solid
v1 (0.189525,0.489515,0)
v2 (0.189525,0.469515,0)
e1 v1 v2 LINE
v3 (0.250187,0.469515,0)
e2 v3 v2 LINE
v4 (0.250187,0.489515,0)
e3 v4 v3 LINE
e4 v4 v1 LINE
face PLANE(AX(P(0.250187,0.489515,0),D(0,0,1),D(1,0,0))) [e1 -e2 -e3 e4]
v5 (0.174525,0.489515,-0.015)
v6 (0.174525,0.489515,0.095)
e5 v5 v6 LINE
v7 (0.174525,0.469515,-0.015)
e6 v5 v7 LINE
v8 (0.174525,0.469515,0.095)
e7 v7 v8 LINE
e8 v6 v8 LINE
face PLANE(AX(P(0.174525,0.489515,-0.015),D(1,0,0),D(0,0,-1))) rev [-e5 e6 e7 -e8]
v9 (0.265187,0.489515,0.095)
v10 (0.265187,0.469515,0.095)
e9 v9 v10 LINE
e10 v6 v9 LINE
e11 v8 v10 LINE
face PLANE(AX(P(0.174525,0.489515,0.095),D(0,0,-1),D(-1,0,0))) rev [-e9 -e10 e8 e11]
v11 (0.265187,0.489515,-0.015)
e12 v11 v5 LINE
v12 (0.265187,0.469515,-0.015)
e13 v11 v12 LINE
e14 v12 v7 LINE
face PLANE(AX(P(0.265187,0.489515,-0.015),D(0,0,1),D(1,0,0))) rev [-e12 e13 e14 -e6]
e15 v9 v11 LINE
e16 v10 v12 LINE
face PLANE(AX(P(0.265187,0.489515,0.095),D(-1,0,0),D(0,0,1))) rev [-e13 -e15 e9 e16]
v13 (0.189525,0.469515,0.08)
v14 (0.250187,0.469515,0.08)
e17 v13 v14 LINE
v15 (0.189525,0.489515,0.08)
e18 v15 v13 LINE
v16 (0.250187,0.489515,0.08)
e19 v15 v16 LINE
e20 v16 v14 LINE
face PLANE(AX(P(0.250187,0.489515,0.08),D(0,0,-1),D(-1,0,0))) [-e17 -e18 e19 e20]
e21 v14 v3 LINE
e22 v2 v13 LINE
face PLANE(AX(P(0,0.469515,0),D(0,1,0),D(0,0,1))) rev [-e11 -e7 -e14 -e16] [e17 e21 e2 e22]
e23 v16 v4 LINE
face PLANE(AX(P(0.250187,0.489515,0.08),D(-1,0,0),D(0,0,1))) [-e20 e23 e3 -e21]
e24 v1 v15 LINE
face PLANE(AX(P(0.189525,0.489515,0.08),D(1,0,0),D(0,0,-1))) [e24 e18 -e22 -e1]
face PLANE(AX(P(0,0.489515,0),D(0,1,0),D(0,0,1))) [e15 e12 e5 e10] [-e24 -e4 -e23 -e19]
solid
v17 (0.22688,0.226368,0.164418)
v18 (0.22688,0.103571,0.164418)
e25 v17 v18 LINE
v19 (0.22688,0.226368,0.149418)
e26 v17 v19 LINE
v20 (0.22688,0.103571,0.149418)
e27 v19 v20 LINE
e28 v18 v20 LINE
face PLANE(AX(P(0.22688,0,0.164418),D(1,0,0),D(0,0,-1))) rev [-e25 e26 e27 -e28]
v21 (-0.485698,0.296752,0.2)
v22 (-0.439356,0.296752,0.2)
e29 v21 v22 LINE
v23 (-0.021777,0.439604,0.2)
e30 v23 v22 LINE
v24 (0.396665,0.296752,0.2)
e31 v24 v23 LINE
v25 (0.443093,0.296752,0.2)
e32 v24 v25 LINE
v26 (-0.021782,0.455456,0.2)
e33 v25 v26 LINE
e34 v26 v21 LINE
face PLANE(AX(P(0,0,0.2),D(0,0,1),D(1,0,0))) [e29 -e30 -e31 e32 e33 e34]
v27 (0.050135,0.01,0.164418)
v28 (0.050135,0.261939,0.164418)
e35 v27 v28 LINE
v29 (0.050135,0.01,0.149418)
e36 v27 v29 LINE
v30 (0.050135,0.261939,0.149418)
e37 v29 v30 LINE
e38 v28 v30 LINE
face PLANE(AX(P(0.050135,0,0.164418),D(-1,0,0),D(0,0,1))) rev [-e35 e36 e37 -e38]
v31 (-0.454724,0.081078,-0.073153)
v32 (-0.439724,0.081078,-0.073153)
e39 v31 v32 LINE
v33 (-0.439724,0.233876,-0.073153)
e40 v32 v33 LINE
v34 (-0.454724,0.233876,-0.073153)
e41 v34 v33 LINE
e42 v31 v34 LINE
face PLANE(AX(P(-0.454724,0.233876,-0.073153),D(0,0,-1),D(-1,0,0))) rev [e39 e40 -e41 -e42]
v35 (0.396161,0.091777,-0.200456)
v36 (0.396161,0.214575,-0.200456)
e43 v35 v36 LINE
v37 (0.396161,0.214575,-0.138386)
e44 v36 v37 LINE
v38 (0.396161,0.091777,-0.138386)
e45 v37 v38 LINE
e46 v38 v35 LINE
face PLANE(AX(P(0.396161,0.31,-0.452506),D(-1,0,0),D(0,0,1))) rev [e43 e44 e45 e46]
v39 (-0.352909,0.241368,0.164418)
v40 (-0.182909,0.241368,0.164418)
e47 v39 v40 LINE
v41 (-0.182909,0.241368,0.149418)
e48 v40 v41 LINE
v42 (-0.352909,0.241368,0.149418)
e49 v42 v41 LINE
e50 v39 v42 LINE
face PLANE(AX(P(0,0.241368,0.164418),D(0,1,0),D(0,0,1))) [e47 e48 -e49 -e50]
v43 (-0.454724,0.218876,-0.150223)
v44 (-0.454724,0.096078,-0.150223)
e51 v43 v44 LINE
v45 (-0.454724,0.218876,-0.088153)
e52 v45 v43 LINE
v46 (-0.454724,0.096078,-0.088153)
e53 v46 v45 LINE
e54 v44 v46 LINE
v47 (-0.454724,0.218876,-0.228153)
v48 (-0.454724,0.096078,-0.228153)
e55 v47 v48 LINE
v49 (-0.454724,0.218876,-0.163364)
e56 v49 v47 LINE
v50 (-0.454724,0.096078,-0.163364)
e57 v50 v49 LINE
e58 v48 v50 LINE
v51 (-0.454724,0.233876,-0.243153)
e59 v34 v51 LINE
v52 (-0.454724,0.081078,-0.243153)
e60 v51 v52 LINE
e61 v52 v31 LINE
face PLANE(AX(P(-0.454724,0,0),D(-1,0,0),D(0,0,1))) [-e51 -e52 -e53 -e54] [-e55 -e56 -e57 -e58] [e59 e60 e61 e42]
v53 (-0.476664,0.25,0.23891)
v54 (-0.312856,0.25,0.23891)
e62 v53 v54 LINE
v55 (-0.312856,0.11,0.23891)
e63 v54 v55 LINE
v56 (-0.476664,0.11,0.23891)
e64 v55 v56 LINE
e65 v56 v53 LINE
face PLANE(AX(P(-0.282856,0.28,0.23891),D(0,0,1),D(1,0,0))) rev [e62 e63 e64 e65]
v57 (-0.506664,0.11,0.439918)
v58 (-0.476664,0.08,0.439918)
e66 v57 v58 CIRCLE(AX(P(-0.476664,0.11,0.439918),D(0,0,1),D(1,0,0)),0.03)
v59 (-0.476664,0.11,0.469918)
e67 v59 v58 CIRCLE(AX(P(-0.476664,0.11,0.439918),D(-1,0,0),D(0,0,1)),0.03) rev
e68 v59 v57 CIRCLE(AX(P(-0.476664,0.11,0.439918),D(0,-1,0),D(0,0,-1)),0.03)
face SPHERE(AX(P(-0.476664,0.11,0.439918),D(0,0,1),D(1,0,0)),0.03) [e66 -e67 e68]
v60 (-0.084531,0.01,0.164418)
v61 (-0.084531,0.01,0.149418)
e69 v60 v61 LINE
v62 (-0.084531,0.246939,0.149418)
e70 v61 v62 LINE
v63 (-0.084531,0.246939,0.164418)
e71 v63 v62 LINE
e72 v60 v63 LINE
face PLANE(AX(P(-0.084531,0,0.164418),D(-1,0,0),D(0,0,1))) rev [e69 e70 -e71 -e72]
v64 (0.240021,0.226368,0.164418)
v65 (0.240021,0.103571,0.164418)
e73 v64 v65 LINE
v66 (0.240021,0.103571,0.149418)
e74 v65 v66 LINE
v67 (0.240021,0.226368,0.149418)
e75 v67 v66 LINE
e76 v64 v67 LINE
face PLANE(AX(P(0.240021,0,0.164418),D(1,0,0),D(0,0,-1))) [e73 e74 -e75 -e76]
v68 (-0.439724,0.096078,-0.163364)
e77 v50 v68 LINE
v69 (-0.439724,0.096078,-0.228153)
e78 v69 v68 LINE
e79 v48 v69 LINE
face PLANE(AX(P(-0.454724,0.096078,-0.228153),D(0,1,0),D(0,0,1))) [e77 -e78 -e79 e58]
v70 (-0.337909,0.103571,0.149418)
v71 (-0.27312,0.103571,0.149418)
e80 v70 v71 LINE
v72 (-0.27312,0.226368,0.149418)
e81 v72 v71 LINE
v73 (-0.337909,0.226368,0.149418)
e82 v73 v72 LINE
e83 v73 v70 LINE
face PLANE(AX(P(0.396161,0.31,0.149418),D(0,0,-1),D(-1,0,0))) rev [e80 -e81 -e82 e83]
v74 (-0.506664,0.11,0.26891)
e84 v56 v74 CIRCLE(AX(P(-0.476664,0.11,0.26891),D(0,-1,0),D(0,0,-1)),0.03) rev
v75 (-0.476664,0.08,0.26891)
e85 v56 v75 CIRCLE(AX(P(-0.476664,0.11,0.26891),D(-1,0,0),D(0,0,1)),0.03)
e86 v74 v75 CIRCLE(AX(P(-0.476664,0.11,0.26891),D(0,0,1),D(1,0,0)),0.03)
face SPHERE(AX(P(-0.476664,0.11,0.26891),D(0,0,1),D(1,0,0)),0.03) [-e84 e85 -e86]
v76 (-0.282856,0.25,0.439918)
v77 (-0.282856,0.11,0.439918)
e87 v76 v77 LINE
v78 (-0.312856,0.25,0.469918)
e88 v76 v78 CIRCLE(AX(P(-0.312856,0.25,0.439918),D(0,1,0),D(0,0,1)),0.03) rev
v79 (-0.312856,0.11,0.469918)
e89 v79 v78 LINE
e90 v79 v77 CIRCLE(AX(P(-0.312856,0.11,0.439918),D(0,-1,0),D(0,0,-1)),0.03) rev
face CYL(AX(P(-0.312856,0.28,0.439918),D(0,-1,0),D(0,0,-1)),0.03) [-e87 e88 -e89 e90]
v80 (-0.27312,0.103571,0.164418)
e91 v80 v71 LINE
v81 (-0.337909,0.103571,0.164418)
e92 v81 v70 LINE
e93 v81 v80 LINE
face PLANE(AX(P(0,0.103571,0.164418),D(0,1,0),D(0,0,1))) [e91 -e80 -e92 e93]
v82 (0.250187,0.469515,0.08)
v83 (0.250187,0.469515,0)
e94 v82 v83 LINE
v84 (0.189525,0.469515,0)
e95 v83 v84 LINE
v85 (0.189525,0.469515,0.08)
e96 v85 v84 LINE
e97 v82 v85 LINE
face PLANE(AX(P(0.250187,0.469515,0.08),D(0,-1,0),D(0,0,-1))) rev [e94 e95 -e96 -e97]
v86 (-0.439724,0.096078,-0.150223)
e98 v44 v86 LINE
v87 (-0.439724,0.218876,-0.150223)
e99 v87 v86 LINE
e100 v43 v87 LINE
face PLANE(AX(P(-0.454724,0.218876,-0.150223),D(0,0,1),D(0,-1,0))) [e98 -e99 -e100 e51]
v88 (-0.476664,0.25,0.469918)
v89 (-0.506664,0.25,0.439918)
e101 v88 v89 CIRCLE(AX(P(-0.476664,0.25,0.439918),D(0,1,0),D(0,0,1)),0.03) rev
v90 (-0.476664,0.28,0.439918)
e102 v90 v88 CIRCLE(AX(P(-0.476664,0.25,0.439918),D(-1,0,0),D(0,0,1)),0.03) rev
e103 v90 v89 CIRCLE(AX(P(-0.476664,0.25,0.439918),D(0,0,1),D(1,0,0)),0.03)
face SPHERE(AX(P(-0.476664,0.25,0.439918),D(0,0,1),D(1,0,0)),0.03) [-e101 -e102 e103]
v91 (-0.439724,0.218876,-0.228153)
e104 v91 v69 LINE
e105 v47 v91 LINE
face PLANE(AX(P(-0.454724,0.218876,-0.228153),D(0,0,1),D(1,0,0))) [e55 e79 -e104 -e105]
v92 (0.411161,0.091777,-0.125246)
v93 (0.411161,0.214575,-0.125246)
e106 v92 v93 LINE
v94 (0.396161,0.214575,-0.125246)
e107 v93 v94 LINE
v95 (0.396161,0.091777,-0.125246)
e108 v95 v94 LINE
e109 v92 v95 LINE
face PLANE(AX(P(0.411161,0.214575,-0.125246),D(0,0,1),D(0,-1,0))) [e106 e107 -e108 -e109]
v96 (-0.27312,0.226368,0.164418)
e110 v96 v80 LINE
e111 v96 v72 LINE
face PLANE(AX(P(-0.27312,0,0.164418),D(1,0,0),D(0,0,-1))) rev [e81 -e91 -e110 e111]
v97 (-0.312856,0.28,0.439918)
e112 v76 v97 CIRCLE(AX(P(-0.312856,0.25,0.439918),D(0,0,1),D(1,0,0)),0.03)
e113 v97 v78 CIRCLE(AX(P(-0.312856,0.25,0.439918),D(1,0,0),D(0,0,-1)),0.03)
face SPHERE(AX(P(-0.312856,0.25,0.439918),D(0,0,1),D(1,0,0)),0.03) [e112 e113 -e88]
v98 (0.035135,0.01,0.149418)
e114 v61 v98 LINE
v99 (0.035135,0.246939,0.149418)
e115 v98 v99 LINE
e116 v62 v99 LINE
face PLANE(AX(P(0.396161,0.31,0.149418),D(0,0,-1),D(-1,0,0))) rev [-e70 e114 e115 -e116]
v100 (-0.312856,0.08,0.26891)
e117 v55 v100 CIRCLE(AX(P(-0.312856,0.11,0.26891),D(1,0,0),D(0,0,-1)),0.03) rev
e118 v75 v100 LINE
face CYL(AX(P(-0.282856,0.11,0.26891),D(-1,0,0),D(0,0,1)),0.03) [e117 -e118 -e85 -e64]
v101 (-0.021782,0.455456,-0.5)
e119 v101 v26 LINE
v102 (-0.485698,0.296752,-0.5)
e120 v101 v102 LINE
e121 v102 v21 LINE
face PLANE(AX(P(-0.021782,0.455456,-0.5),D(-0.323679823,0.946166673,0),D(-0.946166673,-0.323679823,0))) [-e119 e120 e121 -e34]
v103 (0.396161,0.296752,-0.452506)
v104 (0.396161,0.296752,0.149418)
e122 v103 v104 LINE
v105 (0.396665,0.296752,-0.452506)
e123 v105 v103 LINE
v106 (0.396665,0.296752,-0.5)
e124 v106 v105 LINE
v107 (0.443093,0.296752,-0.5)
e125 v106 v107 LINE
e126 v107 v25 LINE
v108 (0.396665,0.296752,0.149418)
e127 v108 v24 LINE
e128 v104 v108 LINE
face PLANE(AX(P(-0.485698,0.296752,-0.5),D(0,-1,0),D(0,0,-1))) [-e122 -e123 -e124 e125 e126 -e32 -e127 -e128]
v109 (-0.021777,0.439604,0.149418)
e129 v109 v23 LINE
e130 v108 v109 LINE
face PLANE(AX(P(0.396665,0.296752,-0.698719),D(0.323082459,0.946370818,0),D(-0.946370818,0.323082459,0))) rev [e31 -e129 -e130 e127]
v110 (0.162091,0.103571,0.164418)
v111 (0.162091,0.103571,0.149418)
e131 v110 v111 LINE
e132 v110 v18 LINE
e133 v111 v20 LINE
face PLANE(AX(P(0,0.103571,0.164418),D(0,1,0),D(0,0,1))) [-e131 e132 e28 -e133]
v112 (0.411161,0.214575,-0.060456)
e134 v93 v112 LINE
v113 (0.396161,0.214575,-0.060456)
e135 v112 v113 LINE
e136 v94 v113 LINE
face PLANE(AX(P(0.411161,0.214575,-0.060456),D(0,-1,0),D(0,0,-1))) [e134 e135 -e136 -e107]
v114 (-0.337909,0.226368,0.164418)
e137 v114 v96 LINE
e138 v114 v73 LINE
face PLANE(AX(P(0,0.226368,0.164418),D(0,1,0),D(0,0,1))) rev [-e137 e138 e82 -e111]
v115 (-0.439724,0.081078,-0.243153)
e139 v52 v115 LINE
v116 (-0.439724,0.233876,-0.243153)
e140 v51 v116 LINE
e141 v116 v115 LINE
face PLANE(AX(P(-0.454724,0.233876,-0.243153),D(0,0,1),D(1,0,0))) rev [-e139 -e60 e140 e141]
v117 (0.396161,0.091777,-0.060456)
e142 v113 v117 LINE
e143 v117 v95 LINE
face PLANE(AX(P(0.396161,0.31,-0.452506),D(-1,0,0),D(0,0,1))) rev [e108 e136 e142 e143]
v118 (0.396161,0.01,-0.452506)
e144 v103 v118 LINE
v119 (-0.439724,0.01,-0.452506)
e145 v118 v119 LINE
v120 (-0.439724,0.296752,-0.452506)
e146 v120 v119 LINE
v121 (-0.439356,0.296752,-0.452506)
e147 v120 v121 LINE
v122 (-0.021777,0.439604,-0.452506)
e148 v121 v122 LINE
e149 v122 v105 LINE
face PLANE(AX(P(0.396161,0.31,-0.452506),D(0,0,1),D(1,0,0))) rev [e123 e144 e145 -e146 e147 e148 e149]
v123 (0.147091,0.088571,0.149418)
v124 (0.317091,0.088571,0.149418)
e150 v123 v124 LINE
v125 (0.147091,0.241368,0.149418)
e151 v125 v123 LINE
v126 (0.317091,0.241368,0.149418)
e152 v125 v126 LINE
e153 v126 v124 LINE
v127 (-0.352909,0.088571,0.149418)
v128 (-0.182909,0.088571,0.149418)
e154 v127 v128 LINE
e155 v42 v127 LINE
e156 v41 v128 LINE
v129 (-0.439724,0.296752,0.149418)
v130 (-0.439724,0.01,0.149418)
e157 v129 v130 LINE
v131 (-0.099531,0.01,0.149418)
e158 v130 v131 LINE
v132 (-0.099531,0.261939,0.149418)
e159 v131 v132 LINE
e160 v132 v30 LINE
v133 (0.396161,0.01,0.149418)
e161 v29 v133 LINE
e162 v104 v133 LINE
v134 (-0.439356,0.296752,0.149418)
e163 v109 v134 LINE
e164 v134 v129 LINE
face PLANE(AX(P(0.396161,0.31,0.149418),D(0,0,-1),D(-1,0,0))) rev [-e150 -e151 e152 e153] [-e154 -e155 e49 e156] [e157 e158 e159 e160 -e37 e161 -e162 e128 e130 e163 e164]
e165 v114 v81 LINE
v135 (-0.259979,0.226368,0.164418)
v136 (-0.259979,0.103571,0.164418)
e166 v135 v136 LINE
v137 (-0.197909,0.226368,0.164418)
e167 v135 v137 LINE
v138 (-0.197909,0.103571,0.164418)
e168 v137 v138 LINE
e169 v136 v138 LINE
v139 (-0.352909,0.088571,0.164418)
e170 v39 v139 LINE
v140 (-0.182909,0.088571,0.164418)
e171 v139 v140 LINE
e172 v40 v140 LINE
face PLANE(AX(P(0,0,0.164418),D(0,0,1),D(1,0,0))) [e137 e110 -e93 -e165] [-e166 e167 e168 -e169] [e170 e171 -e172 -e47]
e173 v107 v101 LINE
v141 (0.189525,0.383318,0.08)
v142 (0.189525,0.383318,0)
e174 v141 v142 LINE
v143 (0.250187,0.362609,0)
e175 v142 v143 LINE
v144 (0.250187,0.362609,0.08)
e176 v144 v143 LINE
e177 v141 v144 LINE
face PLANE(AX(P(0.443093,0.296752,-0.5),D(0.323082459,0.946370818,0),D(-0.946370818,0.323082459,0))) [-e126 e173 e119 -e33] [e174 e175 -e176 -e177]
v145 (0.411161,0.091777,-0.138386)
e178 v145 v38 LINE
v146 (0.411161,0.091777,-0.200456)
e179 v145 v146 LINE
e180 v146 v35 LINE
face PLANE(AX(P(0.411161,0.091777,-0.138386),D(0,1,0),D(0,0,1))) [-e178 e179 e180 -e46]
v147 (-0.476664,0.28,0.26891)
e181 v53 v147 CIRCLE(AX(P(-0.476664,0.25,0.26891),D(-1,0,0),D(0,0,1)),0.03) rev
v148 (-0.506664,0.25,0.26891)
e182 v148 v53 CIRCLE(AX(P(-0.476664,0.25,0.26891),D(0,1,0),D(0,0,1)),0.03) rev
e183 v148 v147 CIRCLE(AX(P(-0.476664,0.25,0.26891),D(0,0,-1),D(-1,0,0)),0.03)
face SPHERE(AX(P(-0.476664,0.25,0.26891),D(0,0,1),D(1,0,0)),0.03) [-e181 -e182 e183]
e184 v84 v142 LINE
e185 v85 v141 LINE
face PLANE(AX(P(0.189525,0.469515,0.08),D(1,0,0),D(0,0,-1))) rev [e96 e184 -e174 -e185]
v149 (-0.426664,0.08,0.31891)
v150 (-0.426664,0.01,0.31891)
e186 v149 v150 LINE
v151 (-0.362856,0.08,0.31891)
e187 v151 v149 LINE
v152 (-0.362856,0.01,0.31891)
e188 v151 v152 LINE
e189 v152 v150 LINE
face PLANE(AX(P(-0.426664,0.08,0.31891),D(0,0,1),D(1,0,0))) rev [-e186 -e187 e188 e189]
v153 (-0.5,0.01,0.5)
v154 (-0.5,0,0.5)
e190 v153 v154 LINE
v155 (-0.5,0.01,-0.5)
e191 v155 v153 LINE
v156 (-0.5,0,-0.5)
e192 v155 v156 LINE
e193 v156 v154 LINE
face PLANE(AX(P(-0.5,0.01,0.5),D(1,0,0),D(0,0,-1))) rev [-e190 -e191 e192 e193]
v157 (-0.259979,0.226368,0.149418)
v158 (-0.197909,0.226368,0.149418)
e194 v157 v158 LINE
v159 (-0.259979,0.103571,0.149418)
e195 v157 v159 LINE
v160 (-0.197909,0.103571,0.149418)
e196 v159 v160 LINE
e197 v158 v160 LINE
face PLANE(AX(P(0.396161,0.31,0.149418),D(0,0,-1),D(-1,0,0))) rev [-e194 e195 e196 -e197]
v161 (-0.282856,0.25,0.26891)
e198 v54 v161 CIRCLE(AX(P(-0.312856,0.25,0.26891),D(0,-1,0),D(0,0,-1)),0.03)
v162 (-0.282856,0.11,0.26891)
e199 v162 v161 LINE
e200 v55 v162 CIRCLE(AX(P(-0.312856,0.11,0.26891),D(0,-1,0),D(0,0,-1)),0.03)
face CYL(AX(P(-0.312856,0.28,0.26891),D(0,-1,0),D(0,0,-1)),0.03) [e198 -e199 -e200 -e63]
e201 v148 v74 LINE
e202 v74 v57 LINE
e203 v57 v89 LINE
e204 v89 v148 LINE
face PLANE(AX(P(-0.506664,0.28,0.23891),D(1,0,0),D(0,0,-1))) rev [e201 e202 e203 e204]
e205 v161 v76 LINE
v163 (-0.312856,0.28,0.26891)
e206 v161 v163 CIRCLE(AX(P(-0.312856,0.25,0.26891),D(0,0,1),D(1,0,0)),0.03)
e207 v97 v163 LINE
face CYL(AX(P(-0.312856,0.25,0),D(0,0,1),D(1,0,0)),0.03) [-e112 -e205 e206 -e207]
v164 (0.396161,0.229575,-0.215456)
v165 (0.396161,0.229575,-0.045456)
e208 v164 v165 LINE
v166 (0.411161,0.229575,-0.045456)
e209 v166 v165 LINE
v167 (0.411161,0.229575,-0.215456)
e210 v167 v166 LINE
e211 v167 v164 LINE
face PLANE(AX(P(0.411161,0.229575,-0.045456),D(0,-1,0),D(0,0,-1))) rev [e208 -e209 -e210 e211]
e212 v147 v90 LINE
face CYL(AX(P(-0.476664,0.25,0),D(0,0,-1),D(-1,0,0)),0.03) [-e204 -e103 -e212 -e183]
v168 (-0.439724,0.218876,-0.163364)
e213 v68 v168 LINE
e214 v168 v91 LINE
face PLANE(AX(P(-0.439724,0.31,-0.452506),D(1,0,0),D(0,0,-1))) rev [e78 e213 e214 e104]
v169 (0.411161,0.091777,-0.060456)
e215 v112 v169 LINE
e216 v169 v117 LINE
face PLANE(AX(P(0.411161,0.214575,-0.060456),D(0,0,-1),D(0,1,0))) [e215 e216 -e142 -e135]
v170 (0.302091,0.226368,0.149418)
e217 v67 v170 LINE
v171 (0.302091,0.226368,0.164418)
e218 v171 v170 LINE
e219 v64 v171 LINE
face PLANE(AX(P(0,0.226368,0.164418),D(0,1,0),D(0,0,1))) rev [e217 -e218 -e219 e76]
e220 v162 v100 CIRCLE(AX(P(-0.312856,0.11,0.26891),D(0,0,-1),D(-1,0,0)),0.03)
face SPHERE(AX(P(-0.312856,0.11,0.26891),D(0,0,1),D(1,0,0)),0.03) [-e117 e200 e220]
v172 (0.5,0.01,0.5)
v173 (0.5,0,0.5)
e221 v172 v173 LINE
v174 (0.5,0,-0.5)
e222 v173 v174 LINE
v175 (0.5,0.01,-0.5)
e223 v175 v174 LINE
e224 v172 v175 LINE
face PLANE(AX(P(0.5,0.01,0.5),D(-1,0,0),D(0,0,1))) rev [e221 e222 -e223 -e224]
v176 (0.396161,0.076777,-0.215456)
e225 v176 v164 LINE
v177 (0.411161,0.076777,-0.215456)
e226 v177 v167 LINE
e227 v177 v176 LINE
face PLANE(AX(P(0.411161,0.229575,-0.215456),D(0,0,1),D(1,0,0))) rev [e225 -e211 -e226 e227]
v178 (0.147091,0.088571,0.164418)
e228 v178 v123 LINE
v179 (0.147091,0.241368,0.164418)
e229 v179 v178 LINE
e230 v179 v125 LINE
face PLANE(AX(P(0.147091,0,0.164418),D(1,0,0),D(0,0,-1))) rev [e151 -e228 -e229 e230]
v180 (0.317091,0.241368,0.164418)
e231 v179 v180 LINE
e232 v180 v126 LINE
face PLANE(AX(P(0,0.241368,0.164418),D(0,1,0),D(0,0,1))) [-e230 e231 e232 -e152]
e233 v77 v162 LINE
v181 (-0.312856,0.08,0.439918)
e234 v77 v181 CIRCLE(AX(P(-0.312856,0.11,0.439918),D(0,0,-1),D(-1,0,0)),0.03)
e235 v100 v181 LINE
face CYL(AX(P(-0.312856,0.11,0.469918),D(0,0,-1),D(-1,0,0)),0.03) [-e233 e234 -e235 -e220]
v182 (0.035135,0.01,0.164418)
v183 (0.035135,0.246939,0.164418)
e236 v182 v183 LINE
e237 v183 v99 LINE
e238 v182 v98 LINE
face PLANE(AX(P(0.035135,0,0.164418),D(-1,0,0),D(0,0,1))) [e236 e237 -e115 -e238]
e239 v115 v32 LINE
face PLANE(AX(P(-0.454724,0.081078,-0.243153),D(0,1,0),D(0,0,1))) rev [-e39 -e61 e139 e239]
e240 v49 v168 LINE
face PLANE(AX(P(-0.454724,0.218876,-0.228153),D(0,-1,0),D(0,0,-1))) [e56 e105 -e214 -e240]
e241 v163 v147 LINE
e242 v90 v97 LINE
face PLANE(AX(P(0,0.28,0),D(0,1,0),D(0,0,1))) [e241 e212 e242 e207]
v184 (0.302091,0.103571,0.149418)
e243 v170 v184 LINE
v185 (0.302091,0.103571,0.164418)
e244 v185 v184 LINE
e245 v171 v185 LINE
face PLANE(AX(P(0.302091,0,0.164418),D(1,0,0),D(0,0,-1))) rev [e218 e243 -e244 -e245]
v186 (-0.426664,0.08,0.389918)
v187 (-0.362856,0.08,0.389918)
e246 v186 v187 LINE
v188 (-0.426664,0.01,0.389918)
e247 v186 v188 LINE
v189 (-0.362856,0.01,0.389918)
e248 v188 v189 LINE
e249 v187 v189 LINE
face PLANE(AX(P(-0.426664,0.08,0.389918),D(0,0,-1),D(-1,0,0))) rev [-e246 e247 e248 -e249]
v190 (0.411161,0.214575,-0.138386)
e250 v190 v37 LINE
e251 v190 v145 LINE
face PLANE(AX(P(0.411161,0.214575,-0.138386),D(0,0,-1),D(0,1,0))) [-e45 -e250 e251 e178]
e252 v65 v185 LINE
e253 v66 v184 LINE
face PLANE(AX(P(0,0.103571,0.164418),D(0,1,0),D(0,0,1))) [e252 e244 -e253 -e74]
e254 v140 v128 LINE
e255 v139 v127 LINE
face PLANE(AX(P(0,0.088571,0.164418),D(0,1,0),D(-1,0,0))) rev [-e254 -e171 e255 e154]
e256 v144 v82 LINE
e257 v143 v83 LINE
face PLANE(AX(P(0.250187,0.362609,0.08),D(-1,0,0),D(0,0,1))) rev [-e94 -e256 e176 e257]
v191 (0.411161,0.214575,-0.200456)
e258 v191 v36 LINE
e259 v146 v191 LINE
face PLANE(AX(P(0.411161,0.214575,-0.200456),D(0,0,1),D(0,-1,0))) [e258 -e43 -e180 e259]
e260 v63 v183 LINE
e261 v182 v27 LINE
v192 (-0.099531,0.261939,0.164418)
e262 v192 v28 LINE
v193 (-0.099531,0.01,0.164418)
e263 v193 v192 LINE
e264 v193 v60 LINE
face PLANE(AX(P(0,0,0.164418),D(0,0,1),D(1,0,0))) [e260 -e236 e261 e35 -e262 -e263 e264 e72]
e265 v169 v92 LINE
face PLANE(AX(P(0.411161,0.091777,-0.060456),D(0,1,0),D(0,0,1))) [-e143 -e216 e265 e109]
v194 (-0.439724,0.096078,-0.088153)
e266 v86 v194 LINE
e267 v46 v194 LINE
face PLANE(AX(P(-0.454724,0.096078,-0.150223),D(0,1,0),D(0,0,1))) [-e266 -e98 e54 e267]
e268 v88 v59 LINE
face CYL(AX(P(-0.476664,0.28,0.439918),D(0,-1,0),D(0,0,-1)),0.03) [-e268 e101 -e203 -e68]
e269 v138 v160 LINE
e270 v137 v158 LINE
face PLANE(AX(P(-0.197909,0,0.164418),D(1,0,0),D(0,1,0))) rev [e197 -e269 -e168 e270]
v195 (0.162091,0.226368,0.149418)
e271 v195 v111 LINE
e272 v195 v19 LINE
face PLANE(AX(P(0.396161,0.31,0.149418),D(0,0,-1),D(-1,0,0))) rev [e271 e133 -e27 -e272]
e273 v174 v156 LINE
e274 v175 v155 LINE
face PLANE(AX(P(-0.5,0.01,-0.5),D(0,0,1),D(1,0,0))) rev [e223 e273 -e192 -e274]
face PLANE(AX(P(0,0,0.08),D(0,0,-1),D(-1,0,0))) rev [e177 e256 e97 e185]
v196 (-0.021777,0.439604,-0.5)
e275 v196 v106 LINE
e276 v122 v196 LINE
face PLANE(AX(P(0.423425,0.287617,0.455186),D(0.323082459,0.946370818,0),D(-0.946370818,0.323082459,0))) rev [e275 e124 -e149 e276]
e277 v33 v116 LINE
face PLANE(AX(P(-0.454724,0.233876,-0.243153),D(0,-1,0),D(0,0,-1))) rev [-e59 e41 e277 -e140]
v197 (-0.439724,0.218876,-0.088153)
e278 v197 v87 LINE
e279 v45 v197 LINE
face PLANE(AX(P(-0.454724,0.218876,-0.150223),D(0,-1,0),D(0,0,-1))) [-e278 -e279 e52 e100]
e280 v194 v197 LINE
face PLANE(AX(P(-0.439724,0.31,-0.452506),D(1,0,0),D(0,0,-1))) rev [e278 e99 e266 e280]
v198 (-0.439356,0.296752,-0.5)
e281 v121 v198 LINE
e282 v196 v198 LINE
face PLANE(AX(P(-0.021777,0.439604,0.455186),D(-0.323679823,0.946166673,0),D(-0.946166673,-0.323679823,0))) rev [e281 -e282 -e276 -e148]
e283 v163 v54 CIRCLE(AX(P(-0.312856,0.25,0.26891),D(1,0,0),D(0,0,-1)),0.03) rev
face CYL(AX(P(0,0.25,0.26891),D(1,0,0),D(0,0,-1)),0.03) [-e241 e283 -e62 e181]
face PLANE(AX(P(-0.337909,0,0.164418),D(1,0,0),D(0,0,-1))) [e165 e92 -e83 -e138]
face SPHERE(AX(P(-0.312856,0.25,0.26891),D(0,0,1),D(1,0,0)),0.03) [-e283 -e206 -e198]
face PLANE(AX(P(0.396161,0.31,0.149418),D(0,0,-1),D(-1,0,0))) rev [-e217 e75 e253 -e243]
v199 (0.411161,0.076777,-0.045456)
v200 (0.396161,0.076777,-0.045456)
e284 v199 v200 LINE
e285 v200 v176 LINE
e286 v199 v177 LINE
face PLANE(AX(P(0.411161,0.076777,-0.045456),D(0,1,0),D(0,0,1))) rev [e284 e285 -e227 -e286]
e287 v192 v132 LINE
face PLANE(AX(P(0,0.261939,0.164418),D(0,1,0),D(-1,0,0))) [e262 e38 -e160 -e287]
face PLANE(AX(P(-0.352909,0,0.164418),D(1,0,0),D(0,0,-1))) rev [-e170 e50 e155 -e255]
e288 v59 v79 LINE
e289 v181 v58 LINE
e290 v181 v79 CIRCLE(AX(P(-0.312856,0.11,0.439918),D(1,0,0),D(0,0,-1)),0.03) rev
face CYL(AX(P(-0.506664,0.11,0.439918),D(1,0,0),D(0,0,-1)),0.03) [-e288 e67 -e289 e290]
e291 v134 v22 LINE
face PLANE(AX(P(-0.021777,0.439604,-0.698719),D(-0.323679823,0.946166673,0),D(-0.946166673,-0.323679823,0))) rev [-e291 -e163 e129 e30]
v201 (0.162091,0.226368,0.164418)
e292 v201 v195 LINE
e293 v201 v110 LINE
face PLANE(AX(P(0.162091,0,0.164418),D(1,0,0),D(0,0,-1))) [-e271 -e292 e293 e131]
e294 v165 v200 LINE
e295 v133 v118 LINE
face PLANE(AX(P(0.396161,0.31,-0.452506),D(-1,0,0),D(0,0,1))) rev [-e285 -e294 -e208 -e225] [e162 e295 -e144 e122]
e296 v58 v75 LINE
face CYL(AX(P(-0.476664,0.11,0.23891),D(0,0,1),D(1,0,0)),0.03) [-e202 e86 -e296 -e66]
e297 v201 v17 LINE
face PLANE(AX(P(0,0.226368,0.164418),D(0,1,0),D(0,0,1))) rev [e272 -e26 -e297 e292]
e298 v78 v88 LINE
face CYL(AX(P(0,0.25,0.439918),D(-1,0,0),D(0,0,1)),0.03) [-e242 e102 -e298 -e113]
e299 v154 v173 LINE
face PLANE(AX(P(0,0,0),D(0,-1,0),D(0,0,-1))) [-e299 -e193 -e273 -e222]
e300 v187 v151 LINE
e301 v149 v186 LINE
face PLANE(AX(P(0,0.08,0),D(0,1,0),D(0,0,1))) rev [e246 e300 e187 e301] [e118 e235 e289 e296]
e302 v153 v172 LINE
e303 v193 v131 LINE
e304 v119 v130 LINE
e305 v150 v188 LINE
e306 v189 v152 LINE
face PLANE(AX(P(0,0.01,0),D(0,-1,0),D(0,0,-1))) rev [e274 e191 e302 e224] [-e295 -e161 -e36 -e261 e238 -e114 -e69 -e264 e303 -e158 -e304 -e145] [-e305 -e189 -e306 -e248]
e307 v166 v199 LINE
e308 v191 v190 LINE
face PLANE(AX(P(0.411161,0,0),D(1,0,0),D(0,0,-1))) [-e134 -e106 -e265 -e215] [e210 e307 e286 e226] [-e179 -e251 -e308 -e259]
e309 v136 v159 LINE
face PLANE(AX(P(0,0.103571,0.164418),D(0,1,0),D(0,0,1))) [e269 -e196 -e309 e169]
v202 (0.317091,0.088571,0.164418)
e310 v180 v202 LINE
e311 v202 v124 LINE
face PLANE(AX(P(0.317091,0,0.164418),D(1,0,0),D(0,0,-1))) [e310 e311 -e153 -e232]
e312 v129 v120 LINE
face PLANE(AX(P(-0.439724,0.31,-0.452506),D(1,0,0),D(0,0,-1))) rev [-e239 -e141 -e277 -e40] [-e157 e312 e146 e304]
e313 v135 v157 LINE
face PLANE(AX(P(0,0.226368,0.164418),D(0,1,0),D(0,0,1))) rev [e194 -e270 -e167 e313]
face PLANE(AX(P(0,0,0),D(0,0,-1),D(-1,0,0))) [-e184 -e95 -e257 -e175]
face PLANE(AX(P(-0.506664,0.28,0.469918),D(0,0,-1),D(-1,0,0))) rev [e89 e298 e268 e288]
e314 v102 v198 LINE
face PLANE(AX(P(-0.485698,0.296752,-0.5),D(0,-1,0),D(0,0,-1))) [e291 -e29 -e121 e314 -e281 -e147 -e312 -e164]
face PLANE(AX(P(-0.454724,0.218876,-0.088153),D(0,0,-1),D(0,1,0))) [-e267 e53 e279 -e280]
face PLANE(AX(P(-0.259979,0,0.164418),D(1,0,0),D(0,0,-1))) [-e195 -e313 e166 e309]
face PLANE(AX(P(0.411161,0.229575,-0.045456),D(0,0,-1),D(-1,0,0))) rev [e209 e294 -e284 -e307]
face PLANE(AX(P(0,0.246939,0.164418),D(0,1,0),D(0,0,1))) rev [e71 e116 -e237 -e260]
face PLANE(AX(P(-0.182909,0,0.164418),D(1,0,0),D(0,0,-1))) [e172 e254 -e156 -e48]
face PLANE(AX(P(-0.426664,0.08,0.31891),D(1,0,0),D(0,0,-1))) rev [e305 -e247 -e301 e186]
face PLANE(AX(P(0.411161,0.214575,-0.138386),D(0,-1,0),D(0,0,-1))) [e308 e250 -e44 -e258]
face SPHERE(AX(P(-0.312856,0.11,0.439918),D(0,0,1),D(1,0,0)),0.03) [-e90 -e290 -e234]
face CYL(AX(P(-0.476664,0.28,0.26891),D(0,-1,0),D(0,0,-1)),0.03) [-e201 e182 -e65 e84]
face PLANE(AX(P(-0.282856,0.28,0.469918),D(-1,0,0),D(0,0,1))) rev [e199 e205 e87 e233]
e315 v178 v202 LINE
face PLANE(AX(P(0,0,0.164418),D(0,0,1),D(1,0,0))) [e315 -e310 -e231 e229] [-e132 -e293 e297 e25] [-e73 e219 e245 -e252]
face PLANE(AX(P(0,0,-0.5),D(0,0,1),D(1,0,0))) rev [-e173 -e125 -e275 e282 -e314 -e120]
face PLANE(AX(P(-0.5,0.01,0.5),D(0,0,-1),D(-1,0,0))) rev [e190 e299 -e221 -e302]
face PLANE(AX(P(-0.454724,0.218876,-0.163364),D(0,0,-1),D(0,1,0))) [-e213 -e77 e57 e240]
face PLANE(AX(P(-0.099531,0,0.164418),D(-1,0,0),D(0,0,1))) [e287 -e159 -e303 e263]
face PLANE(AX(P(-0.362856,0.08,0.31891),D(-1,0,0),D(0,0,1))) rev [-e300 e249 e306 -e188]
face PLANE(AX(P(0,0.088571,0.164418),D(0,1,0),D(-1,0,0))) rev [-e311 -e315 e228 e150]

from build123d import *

# Parameters (mm, degrees)
ESBO_O1_W                     = 1
ESBO_O1_H                     = 1
RESSALTO_EXTRUS_O1_DEPTH      = 0.01
ESBO_O2_W                     = 0.835884883
ESBO_O2_H                     = 0.601923969
RESSALTO_EXTRUS_O3_DEPTH      = 0.3
RESSALTO_EXTRUS_O5_DEPTH      = 0.2
RESSALTO_EXTRUS_O5_DEPTH_BACK = 0.5
CORTE_EXTRUS_O2_DEPTH         = 0.050581546
CORTE_EXTRUS_O5_DEPTH         = 0.047494485
ESBO_O8_W                     = 0.17
ESBO_O8_H                     = 0.1527975
ESBO_O8_W_2                   = 0.064789378
ESBO_O8_H_2                   = 0.1227975
ESBO_O8_W_3                   = 0.0620701
RESSALTO_EXTRUS_O7_DEPTH      = 0.015
ESBO_O7_W                     = 0.17
ESBO_O7_H                     = 0.1527975
ESBO_O7_W_2                   = 0.064789378
ESBO_O7_H_2                   = 0.1227975
ESBO_O7_W_3                   = 0.0620701
RESSALTO_EXTRUS_O8_DEPTH      = 0.015
ESBO_O6_W                     = 0.17
ESBO_O6_H                     = 0.152797499
ESBO_O6_W_2                   = 0.0620701
ESBO_O6_H_2                   = 0.122797499
ESBO_O6_W_3                   = 0.064789378
RESSALTO_EXTRUS_O9_DEPTH      = 0.015
ESBO_O9_W                     = 0.063807516
ESBO_O9_H                     = 0.071007721
RESSALTO_EXTRUS_O10_DEPTH     = 0.07
ESBO_O11_W                    = 0.223807516
ESBO_O11_H                    = 0.231007721
RESSALTO_EXTRUS_O11_DEPTH     = 0.2
FILETE2_R                     = 0.03
FILETE3_R                     = 0.03
RESSALTO_EXTRUS_O12_DEPTH     = 0.08
ESBO_O13_W                    = 0.090661603
ESBO_O13_H                    = 0.11
ESBO_O13_W_2                  = 0.060661603
ESBO_O13_H_2                  = 0.08
RESSALTO_EXTRUS_O13_DEPTH     = 0.02


with BuildPart() as part:
    # Esboço1 → Ressalto-extrusão1 (new body)
    with BuildSketch(Plane(origin=(0, 0, 0), x_dir=(1, 0, 0), z_dir=(0, 1, 0))):
        Rectangle(ESBO_O1_W, ESBO_O1_H)
    extrude(amount=RESSALTO_EXTRUS_O1_DEPTH)

    # Esboço2 → Ressalto-extrusão3 (add)
    with BuildSketch(Plane(origin=(0, 0.01, 0), x_dir=(1, 0, 0), z_dir=(0, 1, 0))):
        with Locations((-0.021781552, 0.151543531)):
            Rectangle(ESBO_O2_W, ESBO_O2_H)
    extrude(amount=RESSALTO_EXTRUS_O3_DEPTH)

    # Esboço3 → Ressalto-extrusão5 (add, two sides: drawn at the far end of the back side and taken through both)
    with BuildSketch(Plane.XY.offset(-RESSALTO_EXTRUS_O5_DEPTH_BACK)):
        Polygon((-0.021781553, 0.455456142), (-0.485697767, 0.296752266), (0.443092699, 0.296752266), align=None)
    extrude(amount=RESSALTO_EXTRUS_O5_DEPTH + RESSALTO_EXTRUS_O5_DEPTH_BACK)

    # Esboço4 → Corte-extrusão2 (cut)
    with BuildSketch(Plane.XY.offset(0.2)):
        Polygon((-0.439355675, 0.296752266), (0.396664924, 0.296752266), (-0.021776549, 0.43960441), align=None)
    extrude(amount=-CORTE_EXTRUS_O2_DEPTH, mode=Mode.SUBTRACT)

    # Esboço5 → Corte-extrusão5 (cut)
    with BuildSketch(Plane(origin=(0, 0, -0.5), x_dir=(-1, 0, 0), z_dir=(0, 0, -1))):
        Polygon((0.471154082, 0.285874159), (-0.423424888, 0.287616656), (0.021776549, 0.43960441), align=None)
    extrude(amount=-CORTE_EXTRUS_O5_DEPTH, mode=Mode.SUBTRACT)

    # Esboço8 → Ressalto-extrusão7 (add)
    with BuildSketch(Plane(origin=(0.396160889, 0, 0), x_dir=(0, 0, -1), z_dir=(1, 0, 0))):
        with Locations((0.130456206, 0.153176171)):
            Rectangle(ESBO_O8_W, ESBO_O8_H)
        with Locations((0.092850895, 0.153176171)):
            Rectangle(ESBO_O8_W_2, ESBO_O8_H_2, mode=Mode.SUBTRACT)
        with Locations((0.169421156, 0.153176171)):
            Rectangle(ESBO_O8_W_3, ESBO_O8_H_2, mode=Mode.SUBTRACT)
    extrude(amount=RESSALTO_EXTRUS_O7_DEPTH)

    # Esboço7 → Ressalto-extrusão8 (add)
    with BuildSketch(Plane.ZY.offset(0.439723994)):
        with Locations((-0.158153325, 0.157477131)):
            Rectangle(ESBO_O7_W, ESBO_O7_H)
        with Locations((-0.195758636, 0.157477131)):
            Rectangle(ESBO_O7_W_2, ESBO_O7_H_2, mode=Mode.SUBTRACT)
        with Locations((-0.119188375, 0.157477131)):
            Rectangle(ESBO_O7_W_3, ESBO_O7_H_2, mode=Mode.SUBTRACT)
    extrude(amount=RESSALTO_EXTRUS_O8_DEPTH)

    # Esboço6 → Ressalto-extrusão9 (add)
    # profile 1 of 3: a face of its own
    with BuildSketch(Plane.XY.offset(0.149418454)):
        Polygon((-0.099530915, 0.01), (-0.084530915, 0.01), (-0.084530915, 0.246938695), (0.035135203, 0.246938695), (0.035135203, 0.01), (0.050135203, 0.01), (0.050135203, 0.261938695), (-0.099530915, 0.261938695), align=None)
    # profile 2 of 3: a face of its own
    with BuildSketch(Plane.XY.offset(0.149418454)):
        with Locations((-0.267908896, 0.164969523)):
            Rectangle(ESBO_O6_W, ESBO_O6_H)
        with Locations((-0.228943946, 0.164969523)):
            Rectangle(ESBO_O6_W_2, ESBO_O6_H_2, mode=Mode.SUBTRACT)
        with Locations((-0.305514207, 0.164969523)):
            Rectangle(ESBO_O6_W_3, ESBO_O6_H_2, mode=Mode.SUBTRACT)
    # profile 3 of 3: a face of its own
    with BuildSketch(Plane.XY.offset(0.149418454)):
        with Locations((0.232091104, 0.164969523)):
            Rectangle(ESBO_O6_W, ESBO_O6_H)
        with Locations((0.271056054, 0.164969523)):
            Rectangle(ESBO_O6_W_2, ESBO_O6_H_2, mode=Mode.SUBTRACT)
        with Locations((0.194485793, 0.164969523)):
            Rectangle(ESBO_O6_W_3, ESBO_O6_H_2, mode=Mode.SUBTRACT)
    extrude(amount=RESSALTO_EXTRUS_O9_DEPTH)

    # Esboço9 → Ressalto-extrusão10 (add)
    with BuildSketch(Plane(origin=(0, 0.01, 0), x_dir=(1, 0, 0), z_dir=(0, 1, 0))):
        with Locations((-0.394760136, -0.354413696)):
            Rectangle(ESBO_O9_W, ESBO_O9_H)
    extrude(amount=RESSALTO_EXTRUS_O10_DEPTH)

    # Esboço11 → Ressalto-extrusão11 (add)
    with BuildSketch(Plane(origin=(0, 0.08, 0), x_dir=(1, 0, 0), z_dir=(0, 1, 0))):
        with Locations((-0.394760136, -0.354413696)):
            Rectangle(ESBO_O11_W, ESBO_O11_H)
    extrude(amount=RESSALTO_EXTRUS_O11_DEPTH)

    # Filete2
    filete2_edges = [part.edges().sort_by_distance(p)[0] for p in [
        (-0.506663894, 0.08, 0.354413695),
        (-0.506663894, 0.18, 0.238909835),
        (-0.394760136, 0.08, 0.469917556),
        (-0.506663894, 0.18, 0.469917556),
        (-0.282856378, 0.18, 0.469917556),
        (-0.394760136, 0.28, 0.238909835),
        (-0.506663894, 0.28, 0.354413695),
        (-0.394760136, 0.28, 0.469917556),
        (-0.282856378, 0.28, 0.354413695),
    ]]
    fillet(filete2_edges, radius=FILETE2_R)

    # Filete3
    # the kernel refuses this fillet: 0.03 mm, written as the material it takes off along each edge
    with BuildSketch(Plane(origin=(-0.476663894, 0.11, 0.268909835), x_dir=(0, 0, -1), z_dir=(0, -1, 0))) as filete3_piece_1_section:
        Polygon((0, 0), (FILETE3_R, 0), (FILETE3_R, -FILETE3_R), (0, -FILETE3_R), align=None)
    filete3_piece_1 = extrude(amount=FILETE3_R, mode=Mode.PRIVATE)
    filete3_piece_1 = filete3_piece_1 - Plane(origin=(-0.476663894, 0.11, 0.268909835), x_dir=(0.7071067811865475, 0, 0.7071067811865475), z_dir=(0, -1, 0)) * Sphere(FILETE3_R, mode=Mode.PRIVATE)
    add(filete3_piece_1, mode=Mode.SUBTRACT)
    with BuildSketch(Plane(origin=(-0.312856378, 0.25, 0.268909835), x_dir=(1, 0, 0), z_dir=(0, 0, -1))) as filete3_piece_2_section:
        Polygon((0, 0), (FILETE3_R, 0), (FILETE3_R, -FILETE3_R), (0, -FILETE3_R), align=None)
    filete3_piece_2 = extrude(amount=FILETE3_R, mode=Mode.PRIVATE)
    filete3_piece_2 = filete3_piece_2 - Plane(origin=(-0.312856378, 0.25, 0.268909835), x_dir=(-0.7071067811865475, -0.7071067811865475, 0), z_dir=(0, 0, -1)) * Sphere(FILETE3_R, mode=Mode.PRIVATE)
    add(filete3_piece_2, mode=Mode.SUBTRACT)
    with BuildSketch(Plane(origin=(-0.312856378, 0.11, 0.439917556), x_dir=(1, 0, 0), z_dir=(0, -1, 0))) as filete3_piece_3_section:
        Polygon((0, 0), (FILETE3_R, 0), (FILETE3_R, FILETE3_R), (0, FILETE3_R), align=None)
    filete3_piece_3 = extrude(amount=FILETE3_R, mode=Mode.PRIVATE)
    filete3_piece_3 = filete3_piece_3 - Plane(origin=(-0.312856378, 0.11, 0.439917556), x_dir=(-0.7071067811865475, 0, -0.7071067811865475), z_dir=(0, -1, 0)) * Sphere(FILETE3_R, mode=Mode.PRIVATE)
    add(filete3_piece_3, mode=Mode.SUBTRACT)
    with BuildSketch(Plane(origin=(-0.312856378, 0.11, 0.268909835), x_dir=(0, -1, 0), z_dir=(1, 0, 0))) as filete3_piece_4_section:
        Polygon((0, 0), (FILETE3_R, 0), (FILETE3_R, FILETE3_R), (0, FILETE3_R), align=None)
    filete3_piece_4 = extrude(amount=FILETE3_R, mode=Mode.PRIVATE)
    filete3_piece_4 = filete3_piece_4 - Plane(origin=(-0.312856378, 0.11, 0.268909835), x_dir=(0, 0.7071067811865475, 0.7071067811865475), z_dir=(1, 0, 0)) * Sphere(FILETE3_R, mode=Mode.PRIVATE)
    add(filete3_piece_4, mode=Mode.SUBTRACT)
    with BuildSketch(Plane(origin=(-0.312856378, 0.08, 0.238909835), x_dir=(0, 0, 1), z_dir=(-1, 0, 0))) as filete3_piece_5:
        with BuildLine():
            CenterArc((FILETE3_R, FILETE3_R), FILETE3_R, 180, 90)
            Line((0, FILETE3_R), (0, 0))
            Line((0, 0), (FILETE3_R, 0))
        make_face()
    extrude(amount=0.163807516, mode=Mode.SUBTRACT)
    with BuildSketch(Plane(origin=(-0.282856378, 0.08, 0.439917556), x_dir=(-1, 0, 0), z_dir=(0, 0, -1))) as filete3_piece_6:
        with BuildLine():
            CenterArc((FILETE3_R, FILETE3_R), FILETE3_R, 180, 90)
            Line((0, FILETE3_R), (0, 0))
            Line((0, 0), (FILETE3_R, 0))
        make_face()
    extrude(amount=0.171007722, mode=Mode.SUBTRACT)
    with BuildSketch(Plane(origin=(-0.282856378, 0.11, 0.238909835), x_dir=(-1, 0, 0), z_dir=(0, 1, 0))) as filete3_piece_7:
        with BuildLine():
            CenterArc((FILETE3_R, FILETE3_R), FILETE3_R, 180, 90)
            Line((0, FILETE3_R), (0, 0))
            Line((0, 0), (FILETE3_R, 0))
        make_face()
    extrude(amount=0.14, mode=Mode.SUBTRACT)

    # Esboço12 → Ressalto-extrusão12 (add)
    with BuildSketch(Plane.XY):
        Polygon((0.189525463, 0.383317833), (0.250187066, 0.362608509), (0.250187066, 0.469514712), (0.189525463, 0.469514712), align=None)
    extrude(amount=RESSALTO_EXTRUS_O12_DEPTH)


with BuildPart() as body_2:
    # Esboço13 → Ressalto-extrusão13 (new body)
    with BuildSketch(Plane(origin=(0, 0.469514712, 0), x_dir=(1, 0, 0), z_dir=(0, 1, 0))):
        with Locations((0.219856265, -0.04)):
            Rectangle(ESBO_O13_W, ESBO_O13_H)
        with Locations((0.219856265, -0.04)):
            Rectangle(ESBO_O13_W_2, ESBO_O13_H_2, mode=Mode.SUBTRACT)
    extrude(amount=RESSALTO_EXTRUS_O13_DEPTH)


solid = Compound([part.part, body_2.part])
